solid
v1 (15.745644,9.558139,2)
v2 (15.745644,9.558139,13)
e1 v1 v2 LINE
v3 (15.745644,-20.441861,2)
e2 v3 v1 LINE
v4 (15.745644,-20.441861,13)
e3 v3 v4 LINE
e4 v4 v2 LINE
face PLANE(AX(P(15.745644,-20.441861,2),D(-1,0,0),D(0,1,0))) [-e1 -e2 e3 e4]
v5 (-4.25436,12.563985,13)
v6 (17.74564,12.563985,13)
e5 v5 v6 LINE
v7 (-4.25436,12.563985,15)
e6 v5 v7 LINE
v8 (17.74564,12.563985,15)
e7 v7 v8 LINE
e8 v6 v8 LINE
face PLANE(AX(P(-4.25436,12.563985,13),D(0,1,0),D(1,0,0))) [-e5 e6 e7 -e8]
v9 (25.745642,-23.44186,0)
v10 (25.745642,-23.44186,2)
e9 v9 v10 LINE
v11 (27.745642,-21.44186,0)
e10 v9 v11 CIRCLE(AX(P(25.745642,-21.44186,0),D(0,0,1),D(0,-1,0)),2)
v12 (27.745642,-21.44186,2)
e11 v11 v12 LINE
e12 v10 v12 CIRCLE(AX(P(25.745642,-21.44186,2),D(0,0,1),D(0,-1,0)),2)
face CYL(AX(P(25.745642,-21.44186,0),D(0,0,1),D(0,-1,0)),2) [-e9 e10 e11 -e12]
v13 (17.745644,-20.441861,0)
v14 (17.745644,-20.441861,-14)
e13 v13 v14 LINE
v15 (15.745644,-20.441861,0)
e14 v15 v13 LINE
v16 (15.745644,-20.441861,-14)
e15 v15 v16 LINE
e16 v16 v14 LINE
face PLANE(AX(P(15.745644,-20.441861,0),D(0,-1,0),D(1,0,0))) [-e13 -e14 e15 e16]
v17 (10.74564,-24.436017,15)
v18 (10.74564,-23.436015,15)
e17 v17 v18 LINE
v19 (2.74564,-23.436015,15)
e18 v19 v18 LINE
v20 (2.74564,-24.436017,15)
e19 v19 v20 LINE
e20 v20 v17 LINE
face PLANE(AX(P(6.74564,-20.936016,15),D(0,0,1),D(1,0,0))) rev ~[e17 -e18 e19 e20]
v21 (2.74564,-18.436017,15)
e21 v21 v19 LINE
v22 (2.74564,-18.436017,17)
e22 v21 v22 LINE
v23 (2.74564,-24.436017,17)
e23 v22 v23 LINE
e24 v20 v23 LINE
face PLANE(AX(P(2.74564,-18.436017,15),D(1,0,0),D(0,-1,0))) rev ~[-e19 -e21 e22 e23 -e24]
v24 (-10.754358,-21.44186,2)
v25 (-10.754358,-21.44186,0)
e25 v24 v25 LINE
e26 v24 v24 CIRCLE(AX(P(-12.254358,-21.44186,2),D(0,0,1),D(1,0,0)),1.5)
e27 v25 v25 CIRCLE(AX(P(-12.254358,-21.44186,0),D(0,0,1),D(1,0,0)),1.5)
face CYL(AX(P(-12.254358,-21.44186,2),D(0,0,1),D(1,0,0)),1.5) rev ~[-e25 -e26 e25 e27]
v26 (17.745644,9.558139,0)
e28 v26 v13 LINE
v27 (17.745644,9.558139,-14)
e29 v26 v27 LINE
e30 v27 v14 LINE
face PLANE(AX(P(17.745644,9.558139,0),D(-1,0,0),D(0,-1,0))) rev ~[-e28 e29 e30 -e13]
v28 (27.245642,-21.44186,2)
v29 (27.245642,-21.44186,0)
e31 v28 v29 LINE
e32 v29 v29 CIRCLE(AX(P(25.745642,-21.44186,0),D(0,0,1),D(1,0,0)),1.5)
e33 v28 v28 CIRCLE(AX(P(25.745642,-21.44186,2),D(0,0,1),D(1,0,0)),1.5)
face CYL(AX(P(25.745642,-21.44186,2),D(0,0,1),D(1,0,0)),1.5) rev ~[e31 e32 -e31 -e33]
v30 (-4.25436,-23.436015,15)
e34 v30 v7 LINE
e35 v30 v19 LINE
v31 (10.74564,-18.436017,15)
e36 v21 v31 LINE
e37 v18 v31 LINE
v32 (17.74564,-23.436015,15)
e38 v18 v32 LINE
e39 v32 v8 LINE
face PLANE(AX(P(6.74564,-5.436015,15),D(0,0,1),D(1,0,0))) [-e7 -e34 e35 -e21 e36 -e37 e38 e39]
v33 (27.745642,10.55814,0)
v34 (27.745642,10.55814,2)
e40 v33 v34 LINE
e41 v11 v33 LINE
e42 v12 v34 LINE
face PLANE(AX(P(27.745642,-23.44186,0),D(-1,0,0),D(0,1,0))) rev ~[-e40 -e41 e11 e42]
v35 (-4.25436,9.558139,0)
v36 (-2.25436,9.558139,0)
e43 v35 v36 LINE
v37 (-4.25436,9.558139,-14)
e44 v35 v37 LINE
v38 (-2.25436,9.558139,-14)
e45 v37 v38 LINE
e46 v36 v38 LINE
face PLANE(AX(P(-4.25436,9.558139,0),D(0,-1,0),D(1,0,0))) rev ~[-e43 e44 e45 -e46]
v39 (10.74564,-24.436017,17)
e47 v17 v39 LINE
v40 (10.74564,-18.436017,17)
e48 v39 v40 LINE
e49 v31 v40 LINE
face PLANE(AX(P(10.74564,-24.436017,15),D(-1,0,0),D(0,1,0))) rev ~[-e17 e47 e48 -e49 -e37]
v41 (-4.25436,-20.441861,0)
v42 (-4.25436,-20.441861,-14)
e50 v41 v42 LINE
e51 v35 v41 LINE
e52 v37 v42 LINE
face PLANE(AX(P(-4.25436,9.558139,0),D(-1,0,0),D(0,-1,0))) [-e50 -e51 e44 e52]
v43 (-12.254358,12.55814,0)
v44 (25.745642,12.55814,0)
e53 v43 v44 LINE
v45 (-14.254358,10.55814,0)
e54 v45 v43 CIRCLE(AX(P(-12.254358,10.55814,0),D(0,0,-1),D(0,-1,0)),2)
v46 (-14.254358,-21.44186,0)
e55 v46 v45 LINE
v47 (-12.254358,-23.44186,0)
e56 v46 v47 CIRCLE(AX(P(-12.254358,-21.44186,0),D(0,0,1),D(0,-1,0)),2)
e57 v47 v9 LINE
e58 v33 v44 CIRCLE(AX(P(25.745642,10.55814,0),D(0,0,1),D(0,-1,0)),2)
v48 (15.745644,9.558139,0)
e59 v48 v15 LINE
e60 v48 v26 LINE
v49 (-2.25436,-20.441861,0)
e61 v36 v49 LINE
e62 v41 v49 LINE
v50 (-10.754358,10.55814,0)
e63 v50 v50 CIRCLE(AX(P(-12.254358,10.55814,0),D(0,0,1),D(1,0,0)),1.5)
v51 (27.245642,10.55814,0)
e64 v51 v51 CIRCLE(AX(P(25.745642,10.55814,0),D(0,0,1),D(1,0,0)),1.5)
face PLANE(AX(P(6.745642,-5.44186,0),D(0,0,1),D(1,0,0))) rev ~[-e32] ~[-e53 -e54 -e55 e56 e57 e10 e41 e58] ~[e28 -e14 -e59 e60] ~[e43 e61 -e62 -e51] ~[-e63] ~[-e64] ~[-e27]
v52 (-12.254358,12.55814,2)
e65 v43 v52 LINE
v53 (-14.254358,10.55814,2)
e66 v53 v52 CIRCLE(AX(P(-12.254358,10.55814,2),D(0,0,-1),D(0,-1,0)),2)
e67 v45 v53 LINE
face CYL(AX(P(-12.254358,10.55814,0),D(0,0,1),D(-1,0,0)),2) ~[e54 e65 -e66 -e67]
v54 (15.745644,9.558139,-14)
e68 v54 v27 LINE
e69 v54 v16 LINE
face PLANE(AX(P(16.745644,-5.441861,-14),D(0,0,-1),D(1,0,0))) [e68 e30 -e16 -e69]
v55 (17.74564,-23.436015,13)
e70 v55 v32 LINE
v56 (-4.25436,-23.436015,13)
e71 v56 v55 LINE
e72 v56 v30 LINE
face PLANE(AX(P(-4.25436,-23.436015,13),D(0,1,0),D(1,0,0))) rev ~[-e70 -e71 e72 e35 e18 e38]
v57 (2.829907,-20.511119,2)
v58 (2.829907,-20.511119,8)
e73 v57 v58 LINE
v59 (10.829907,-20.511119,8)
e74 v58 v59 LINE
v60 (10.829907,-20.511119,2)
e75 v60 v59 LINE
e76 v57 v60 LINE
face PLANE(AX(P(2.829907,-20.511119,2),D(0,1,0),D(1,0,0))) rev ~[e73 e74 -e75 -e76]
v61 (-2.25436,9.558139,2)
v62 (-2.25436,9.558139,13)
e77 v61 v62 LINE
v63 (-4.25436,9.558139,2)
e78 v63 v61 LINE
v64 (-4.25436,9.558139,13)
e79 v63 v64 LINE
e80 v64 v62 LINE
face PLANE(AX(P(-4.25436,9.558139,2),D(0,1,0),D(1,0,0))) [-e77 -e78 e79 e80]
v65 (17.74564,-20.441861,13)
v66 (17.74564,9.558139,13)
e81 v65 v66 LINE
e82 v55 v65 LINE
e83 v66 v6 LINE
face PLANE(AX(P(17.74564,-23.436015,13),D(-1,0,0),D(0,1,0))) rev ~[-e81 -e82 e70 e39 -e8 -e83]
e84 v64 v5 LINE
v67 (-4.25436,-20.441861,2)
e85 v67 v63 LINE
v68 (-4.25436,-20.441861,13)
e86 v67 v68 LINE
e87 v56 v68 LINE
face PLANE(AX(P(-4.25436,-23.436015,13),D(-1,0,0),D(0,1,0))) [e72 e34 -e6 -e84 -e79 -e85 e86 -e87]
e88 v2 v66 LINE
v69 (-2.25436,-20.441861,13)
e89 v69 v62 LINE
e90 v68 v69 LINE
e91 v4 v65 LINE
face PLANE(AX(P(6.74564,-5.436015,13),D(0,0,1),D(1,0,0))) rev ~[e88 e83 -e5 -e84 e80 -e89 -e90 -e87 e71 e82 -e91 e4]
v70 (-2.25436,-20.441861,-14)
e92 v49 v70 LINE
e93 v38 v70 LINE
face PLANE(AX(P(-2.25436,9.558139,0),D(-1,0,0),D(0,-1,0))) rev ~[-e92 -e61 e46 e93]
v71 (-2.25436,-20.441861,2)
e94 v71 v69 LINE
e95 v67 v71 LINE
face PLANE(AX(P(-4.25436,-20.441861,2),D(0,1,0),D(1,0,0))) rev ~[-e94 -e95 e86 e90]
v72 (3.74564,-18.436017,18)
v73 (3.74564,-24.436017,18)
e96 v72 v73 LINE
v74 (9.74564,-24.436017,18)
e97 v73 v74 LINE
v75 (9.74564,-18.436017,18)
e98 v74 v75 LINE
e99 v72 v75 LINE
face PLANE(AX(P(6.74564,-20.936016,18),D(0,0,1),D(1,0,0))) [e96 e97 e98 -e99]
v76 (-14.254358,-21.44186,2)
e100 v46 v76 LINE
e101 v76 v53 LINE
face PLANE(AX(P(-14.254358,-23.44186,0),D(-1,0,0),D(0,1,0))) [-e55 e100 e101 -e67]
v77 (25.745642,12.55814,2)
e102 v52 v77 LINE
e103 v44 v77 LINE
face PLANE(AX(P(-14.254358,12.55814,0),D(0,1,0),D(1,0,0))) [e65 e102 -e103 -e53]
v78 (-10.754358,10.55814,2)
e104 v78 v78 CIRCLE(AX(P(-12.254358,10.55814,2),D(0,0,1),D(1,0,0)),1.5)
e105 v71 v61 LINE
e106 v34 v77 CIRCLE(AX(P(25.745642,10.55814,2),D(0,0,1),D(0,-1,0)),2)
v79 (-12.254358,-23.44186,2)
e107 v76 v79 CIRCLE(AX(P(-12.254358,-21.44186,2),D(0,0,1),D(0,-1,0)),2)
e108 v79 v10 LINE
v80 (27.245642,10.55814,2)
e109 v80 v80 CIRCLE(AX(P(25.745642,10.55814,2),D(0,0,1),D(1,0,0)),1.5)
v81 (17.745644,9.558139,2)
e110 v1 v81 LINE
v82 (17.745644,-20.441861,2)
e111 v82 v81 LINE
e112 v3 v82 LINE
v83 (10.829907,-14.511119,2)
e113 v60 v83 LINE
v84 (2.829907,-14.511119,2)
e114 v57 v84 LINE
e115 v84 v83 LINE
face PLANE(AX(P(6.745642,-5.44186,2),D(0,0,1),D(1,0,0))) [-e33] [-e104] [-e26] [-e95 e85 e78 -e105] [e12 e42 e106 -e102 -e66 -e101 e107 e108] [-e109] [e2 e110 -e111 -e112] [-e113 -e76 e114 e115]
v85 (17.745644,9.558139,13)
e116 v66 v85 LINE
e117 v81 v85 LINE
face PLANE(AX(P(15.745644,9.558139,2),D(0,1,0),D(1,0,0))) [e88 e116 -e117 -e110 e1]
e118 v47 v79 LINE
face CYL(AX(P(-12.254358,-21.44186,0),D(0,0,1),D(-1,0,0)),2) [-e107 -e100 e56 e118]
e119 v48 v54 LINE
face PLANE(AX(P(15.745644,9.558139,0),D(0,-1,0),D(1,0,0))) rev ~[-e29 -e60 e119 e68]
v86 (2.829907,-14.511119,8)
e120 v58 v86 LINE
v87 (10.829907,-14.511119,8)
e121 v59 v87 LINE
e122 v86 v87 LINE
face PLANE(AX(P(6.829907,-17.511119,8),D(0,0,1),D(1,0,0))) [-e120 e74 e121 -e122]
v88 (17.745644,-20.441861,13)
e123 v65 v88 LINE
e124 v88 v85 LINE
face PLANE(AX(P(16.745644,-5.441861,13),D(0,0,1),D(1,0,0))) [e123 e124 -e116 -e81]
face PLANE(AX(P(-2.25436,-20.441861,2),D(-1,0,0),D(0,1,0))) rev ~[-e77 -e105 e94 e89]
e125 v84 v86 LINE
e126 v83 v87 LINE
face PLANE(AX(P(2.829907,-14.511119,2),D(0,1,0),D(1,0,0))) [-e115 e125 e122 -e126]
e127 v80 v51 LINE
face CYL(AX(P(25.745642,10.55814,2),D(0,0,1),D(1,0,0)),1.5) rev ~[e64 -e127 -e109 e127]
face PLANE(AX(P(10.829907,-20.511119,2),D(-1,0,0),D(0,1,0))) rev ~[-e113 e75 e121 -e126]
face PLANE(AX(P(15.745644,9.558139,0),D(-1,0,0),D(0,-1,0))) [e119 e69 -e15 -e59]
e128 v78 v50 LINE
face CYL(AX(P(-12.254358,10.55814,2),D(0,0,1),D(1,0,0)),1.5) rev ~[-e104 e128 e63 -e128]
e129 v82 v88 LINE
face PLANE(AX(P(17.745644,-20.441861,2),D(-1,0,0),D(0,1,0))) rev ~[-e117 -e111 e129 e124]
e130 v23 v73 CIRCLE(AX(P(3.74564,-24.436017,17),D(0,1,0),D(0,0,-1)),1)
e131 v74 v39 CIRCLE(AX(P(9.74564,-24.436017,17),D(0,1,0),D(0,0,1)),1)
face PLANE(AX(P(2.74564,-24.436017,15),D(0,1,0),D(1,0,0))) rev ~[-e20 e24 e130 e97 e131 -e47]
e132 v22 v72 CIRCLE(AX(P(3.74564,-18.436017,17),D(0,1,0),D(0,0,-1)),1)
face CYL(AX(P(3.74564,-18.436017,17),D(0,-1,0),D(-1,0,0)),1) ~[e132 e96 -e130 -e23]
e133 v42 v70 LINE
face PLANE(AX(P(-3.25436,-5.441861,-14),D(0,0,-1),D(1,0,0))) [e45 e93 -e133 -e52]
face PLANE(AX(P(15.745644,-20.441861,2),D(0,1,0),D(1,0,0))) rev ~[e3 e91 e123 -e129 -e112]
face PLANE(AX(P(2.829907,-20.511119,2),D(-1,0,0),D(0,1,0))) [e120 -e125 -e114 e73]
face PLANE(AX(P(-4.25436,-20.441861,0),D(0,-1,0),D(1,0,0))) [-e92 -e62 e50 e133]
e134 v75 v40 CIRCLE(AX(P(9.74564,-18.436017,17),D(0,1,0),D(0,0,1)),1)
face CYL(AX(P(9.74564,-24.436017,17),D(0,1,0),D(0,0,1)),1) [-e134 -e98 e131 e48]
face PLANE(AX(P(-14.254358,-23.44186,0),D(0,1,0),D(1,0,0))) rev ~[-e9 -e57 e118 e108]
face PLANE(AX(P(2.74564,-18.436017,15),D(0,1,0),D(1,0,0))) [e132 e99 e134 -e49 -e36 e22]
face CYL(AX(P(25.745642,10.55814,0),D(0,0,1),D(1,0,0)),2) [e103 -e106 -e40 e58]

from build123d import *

# Parameters (mm, degrees)
F0_W      = 42
F0_H      = 36
F1_DEPTH  = 2
F2_R      = 2
F3_R      = 1.5
F4_DEPTH  = 2
F5_W      = 2
F5_H      = 30
F6_DEPTH  = 14
F7_W      = 2
F7_H      = 30
F8_DEPTH  = 11
F9_W      = 22
F9_H      = 36
F10_DEPTH = 2
F11_W     = 8
F11_H     = 4.9999979734
F11_H_2   = 1.0000020266
F12_DEPTH = 3
F13_R     = 1
F7_W_2    = 8
F7_H_2    = 6
F14_DEPTH = 6


# Not quite as in the source:
# - a feature names something its author has since deleted; it is built from what else it names


with BuildPart() as f1:
    # F0 (on Top) → F1 (new body)
    with BuildSketch(Plane.XY):
        with Locations((6.745641768, -5.4418604523)):
            Rectangle(F0_W, F0_H)
    extrude(amount=F1_DEPTH)

    # F2
    f2_edges = [f1.edges().sort_by_distance(p)[0] for p in [
        (27.745642, -23.44186, 1),
        (27.745642, 12.55814, 1),
        (-14.254358, -23.44186, 1),
        (-14.254358, 12.55814, 1),
    ]]
    fillet(f2_edges, radius=F2_R)

    # F3 (on face) → F4 (cut)
    with BuildSketch(Plane.XY.offset(2)):
        with Locations((-12.254358232, 10.5581395477)):
            Circle(F3_R)
        with Locations((-12.254358232, -21.4418604523)):
            Circle(F3_R)
        with Locations((25.745641768, -21.4418604523)):
            Circle(F3_R)
        with Locations((25.745641768, 10.5581395477)):
            Circle(F3_R)
    extrude(amount=-F4_DEPTH, mode=Mode.SUBTRACT)

    # F5 (on face) → F6 (join)
    with BuildSketch(Plane(origin=(0, 0, 0), x_dir=(1, 0, 0), z_dir=(0, 0, -1))):
        with Locations((16.7456435263, 5.4418606311)):
            Rectangle(F5_W, F5_H)
        with Locations((-3.2543599904, 5.4418606311)):
            Rectangle(F5_W, F5_H)
    extrude(amount=F6_DEPTH)

    # F7 (on face) → F8 (join)
    with BuildSketch(Plane.XY.offset(2)):
        with Locations((16.7456435263, -5.4418606311)):
            Rectangle(F7_W, F7_H)
        with Locations((-3.2543599904, -5.4418606311)):
            Rectangle(F7_W, F7_H)
    extrude(amount=F8_DEPTH)

    # F9 (on face) → F10 (join)
    with BuildSketch(Plane.XY.offset(13)):
        with Locations((6.7456400096, -5.4360154718)):
            Rectangle(F9_W, F9_H)
    extrude(amount=F10_DEPTH)

    # F11 (on face) → F12 (join)
    with BuildSketch(Plane.XY.offset(15)):
        with Locations((6.7456399985, -20.9360164851)):
            Rectangle(F11_W, F11_H)
        with Locations((6.7456399985, -23.9360164851)):
            Rectangle(F11_W, F11_H_2)
    extrude(amount=F12_DEPTH)

    # F13
    f13_edges = [f1.edges().sort_by_distance(p)[0] for p in [
        (10.74564, -21.436017, 18),
        (2.74564, -21.436017, 18),
    ]]
    fillet(f13_edges, radius=F13_R)

    # F7 (on face) → F14 (join)
    with BuildSketch(Plane.XY.offset(2)):
        with Locations((6.829907462, -17.511118643)):
            Rectangle(F7_W_2, F7_H_2)
    extrude(amount=F14_DEPTH)


with BuildPart() as f15_1:
    # F15: copy of F1
    add(f1.part)


solid = f1.part
